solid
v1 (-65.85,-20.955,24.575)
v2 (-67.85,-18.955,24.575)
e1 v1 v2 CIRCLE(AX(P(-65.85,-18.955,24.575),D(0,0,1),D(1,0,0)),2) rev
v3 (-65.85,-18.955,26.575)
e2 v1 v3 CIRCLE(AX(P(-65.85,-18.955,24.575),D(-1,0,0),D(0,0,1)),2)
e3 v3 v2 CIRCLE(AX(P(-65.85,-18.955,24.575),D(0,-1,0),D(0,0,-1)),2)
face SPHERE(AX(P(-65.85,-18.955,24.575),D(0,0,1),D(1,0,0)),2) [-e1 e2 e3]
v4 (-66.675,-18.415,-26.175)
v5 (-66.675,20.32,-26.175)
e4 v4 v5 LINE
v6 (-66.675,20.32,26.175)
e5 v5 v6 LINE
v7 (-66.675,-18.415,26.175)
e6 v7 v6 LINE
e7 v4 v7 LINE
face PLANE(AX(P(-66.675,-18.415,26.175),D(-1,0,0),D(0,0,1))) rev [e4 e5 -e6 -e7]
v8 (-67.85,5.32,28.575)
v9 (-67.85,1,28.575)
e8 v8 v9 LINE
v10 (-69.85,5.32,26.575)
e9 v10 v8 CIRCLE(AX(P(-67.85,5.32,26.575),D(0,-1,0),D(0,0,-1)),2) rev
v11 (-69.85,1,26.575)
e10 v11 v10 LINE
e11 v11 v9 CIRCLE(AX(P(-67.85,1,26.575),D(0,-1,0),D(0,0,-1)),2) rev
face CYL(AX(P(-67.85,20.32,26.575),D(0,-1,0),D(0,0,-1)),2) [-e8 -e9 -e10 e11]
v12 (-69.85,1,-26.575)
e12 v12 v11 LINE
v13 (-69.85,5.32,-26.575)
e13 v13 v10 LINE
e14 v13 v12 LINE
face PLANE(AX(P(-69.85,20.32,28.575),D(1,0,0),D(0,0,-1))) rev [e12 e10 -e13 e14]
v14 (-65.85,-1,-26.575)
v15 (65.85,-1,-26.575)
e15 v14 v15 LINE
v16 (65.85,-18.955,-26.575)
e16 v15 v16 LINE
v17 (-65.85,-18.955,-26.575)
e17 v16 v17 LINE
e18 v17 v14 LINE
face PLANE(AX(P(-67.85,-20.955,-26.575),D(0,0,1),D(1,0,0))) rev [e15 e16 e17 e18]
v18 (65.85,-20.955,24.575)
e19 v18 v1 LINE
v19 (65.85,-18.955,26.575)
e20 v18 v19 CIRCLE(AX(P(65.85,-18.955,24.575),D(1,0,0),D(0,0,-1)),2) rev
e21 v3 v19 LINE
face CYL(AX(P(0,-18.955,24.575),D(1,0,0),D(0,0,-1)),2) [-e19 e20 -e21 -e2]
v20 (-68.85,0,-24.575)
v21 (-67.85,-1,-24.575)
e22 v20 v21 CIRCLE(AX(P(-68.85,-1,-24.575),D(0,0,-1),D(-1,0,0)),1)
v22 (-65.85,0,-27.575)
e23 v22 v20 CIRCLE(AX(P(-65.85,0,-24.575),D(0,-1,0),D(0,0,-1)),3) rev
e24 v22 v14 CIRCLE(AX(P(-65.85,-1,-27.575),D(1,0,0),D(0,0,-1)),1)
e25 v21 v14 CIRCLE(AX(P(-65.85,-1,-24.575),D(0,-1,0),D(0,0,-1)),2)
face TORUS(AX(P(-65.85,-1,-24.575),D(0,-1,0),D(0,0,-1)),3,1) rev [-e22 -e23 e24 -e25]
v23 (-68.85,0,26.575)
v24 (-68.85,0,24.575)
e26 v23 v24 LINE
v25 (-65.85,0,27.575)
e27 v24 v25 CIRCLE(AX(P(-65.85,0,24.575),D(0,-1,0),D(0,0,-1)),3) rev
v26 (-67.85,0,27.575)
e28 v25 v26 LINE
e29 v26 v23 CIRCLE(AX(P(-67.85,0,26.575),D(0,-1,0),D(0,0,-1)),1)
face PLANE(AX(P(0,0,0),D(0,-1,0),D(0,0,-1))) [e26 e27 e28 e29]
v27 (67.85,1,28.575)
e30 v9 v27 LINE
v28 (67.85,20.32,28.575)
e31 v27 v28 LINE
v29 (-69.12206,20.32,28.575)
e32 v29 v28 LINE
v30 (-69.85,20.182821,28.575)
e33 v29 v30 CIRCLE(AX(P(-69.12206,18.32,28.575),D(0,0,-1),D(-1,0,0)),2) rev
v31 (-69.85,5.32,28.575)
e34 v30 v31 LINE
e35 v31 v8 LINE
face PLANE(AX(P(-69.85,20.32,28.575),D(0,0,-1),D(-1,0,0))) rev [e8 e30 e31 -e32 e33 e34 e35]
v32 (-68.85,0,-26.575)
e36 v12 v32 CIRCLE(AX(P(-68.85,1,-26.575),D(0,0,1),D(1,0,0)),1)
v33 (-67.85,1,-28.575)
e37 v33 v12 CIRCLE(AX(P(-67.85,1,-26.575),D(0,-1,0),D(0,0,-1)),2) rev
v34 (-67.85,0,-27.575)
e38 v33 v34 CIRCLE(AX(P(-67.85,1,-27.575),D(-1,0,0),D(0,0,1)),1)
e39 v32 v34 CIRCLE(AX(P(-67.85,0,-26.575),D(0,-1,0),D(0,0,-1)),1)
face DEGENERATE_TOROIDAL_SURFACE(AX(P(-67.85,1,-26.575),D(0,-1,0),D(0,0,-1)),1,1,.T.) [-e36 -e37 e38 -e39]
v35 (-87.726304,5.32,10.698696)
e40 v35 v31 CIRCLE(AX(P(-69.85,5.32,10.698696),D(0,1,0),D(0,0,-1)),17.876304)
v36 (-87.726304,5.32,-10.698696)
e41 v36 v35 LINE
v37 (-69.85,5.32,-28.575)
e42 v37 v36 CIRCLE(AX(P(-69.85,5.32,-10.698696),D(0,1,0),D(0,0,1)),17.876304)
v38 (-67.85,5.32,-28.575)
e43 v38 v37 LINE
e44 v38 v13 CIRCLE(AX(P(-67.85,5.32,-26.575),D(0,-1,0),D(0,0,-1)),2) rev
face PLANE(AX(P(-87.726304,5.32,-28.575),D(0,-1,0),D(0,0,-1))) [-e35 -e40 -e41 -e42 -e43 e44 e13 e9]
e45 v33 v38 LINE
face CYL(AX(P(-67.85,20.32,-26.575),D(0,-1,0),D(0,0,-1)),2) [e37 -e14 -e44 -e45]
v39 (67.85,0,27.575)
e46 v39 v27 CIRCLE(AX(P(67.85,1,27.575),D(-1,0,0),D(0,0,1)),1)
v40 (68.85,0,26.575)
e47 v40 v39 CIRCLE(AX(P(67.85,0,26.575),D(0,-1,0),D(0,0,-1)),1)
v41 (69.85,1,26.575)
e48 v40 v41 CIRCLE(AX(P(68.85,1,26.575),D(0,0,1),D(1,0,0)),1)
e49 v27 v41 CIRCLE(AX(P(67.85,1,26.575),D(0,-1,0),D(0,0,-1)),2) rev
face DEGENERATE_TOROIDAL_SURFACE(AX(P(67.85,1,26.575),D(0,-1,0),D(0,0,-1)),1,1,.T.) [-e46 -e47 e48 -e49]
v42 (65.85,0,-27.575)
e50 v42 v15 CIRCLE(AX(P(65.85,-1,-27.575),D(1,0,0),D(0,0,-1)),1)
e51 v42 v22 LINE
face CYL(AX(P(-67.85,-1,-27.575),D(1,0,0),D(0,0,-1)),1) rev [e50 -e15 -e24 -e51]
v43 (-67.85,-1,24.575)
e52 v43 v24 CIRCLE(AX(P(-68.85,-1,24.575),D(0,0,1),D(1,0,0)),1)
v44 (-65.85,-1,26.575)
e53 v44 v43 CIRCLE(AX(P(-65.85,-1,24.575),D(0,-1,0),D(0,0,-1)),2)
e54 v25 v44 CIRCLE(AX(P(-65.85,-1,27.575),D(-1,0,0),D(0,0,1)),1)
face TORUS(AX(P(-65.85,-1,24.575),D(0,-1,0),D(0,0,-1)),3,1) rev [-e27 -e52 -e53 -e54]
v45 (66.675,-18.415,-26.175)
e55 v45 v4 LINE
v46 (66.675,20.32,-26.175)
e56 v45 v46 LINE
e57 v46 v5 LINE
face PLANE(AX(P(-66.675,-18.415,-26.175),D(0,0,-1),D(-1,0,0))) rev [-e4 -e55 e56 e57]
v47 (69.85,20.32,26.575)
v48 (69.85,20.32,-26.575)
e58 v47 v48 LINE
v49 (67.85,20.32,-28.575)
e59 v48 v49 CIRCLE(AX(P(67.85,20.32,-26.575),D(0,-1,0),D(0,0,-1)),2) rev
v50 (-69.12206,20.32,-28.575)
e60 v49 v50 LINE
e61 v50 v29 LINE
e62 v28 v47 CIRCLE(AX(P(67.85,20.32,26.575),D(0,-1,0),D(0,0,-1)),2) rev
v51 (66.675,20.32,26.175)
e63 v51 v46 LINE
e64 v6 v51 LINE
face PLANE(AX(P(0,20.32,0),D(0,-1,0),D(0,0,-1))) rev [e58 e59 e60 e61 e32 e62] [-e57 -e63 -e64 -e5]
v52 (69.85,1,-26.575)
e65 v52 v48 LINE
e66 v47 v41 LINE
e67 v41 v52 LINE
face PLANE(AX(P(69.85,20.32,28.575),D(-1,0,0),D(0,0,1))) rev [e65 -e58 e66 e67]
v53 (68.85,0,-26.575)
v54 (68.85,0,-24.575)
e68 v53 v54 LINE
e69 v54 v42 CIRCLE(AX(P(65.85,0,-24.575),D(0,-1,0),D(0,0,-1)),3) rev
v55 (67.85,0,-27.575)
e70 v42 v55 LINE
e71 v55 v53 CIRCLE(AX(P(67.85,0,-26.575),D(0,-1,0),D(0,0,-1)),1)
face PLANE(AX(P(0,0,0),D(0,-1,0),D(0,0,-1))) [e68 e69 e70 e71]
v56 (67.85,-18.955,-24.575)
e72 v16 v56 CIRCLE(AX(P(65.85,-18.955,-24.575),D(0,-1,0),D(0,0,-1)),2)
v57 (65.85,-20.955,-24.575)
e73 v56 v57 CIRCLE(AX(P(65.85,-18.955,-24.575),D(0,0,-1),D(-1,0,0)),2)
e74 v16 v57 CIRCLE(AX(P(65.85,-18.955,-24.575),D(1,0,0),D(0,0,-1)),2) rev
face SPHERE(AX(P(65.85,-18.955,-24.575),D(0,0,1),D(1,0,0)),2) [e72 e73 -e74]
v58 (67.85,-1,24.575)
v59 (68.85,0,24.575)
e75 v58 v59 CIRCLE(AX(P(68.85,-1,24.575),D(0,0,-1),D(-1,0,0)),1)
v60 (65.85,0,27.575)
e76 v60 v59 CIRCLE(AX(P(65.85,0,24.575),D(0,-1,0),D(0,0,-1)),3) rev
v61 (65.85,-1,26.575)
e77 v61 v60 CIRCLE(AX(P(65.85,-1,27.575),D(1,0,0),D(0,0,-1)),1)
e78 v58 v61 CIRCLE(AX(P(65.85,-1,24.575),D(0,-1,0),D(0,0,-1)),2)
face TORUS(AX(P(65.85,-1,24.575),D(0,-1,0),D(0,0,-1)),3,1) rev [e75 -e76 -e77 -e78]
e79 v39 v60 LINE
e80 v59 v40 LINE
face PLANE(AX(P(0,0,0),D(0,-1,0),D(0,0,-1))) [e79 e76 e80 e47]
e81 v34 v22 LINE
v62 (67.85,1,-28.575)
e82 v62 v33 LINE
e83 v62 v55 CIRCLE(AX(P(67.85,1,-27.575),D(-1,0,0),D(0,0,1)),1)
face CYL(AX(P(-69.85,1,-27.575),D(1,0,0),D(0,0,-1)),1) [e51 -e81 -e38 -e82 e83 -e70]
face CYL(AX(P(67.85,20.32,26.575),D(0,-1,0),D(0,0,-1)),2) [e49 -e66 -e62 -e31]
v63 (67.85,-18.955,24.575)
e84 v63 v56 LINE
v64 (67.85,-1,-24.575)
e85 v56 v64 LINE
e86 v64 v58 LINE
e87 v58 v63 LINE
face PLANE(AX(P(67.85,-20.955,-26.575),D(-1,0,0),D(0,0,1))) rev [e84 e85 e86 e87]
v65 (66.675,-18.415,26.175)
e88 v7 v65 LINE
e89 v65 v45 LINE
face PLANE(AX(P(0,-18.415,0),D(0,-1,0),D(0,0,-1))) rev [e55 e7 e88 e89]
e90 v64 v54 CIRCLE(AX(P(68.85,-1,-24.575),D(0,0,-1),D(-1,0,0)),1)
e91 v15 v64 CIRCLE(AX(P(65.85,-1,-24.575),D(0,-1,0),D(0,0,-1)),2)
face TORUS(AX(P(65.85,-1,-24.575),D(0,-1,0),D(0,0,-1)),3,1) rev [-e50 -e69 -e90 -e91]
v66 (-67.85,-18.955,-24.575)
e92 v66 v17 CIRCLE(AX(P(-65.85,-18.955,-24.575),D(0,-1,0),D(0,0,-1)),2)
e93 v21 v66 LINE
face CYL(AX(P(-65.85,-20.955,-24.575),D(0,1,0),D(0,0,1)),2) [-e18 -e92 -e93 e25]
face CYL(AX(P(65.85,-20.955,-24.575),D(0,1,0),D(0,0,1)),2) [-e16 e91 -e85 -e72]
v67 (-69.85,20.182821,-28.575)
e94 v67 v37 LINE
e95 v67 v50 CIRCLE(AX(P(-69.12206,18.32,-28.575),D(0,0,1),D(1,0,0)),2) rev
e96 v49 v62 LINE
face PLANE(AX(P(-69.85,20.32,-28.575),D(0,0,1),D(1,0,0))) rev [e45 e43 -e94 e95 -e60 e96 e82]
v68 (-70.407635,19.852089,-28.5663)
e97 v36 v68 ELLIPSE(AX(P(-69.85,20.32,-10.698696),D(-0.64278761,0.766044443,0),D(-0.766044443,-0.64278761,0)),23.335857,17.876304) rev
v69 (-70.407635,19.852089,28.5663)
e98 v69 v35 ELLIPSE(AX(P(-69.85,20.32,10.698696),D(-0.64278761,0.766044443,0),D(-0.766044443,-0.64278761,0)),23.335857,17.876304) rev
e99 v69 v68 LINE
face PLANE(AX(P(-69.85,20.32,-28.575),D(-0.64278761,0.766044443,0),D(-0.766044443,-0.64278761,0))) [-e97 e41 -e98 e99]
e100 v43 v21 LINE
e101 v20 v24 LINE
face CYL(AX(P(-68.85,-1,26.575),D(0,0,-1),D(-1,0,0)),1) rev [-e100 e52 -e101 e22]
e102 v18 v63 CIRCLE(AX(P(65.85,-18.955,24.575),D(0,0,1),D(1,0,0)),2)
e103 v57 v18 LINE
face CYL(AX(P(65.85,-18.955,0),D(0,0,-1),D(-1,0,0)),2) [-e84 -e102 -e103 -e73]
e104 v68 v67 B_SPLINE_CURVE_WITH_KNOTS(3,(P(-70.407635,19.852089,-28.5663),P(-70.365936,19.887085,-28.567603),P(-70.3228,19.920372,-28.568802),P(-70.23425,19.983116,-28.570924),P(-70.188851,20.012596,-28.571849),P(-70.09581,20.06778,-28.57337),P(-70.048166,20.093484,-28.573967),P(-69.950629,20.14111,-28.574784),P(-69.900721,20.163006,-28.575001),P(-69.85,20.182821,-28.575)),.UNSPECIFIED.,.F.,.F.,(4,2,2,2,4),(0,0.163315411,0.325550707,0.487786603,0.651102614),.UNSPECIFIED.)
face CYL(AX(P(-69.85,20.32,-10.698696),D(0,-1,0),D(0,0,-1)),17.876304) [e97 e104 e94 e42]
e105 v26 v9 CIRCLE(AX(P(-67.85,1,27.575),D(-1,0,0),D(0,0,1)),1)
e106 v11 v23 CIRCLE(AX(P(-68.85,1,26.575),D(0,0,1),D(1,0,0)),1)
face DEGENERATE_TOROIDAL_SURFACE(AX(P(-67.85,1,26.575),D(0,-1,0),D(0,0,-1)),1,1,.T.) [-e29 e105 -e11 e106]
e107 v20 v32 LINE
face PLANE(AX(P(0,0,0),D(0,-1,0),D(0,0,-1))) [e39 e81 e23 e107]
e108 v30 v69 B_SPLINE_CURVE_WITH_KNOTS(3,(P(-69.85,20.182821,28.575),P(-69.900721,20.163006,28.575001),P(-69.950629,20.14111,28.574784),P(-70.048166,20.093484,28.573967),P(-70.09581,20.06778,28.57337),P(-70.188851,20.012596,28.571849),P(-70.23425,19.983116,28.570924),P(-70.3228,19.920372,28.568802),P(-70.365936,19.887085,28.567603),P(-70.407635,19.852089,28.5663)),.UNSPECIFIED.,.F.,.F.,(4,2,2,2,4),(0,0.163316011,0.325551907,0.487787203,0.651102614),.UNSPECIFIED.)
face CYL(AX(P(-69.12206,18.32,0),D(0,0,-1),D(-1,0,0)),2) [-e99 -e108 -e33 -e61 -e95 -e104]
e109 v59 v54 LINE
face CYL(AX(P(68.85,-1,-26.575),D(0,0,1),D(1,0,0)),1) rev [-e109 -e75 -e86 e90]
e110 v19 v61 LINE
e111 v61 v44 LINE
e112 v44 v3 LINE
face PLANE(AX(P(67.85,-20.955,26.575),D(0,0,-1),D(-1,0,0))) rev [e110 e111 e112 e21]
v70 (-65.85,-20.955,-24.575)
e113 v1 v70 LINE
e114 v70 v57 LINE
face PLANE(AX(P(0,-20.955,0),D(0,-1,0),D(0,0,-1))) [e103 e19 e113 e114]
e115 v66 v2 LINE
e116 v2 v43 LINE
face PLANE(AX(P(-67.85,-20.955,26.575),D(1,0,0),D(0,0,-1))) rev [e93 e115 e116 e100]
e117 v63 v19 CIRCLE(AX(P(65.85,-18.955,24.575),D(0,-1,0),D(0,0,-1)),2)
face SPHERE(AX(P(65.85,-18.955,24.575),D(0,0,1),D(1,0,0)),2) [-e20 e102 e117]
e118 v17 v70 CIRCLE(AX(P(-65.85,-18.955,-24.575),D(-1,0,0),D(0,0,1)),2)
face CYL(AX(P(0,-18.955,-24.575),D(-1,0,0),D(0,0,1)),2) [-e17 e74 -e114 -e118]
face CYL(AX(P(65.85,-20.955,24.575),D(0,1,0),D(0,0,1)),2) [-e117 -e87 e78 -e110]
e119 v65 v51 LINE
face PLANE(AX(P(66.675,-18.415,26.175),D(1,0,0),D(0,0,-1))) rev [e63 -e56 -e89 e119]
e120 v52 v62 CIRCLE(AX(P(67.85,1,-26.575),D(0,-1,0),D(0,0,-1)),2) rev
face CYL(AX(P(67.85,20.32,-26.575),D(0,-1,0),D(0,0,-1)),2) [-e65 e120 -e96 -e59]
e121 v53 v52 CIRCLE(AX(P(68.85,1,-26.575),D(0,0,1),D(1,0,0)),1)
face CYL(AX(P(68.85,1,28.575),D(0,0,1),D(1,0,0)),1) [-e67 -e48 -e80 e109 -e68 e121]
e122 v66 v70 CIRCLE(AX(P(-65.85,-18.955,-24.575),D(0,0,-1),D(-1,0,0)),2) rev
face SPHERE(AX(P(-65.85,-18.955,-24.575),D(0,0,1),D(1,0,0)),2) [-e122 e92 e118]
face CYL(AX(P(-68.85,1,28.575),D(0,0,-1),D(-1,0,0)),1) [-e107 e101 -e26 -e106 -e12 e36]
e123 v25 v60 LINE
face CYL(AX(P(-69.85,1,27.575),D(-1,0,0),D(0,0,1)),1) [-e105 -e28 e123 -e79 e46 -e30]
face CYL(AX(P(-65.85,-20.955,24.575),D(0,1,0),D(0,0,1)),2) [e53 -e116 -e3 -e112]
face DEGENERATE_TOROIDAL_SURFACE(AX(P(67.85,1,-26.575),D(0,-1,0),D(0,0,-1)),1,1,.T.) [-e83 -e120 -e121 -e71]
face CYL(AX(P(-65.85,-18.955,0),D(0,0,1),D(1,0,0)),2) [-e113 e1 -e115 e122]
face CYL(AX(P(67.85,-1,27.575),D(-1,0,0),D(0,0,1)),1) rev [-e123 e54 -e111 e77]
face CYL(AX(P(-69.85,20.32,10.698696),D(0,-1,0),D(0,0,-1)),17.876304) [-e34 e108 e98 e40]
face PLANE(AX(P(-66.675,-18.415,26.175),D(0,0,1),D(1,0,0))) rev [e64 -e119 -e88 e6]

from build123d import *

# Parameters (mm, degrees)
SKETCH1_W           = 139.7
SKETCH1_H           = 57.15
BOSS_EXTRUDE1_DEPTH = 20.32
SKETCH2_W           = 135.7
SKETCH2_H           = 53.15
BOSS_EXTRUDE2_DEPTH = 20.955
BOSS_EXTRUDE3_DEPTH = 57.15
CUT_EXTRUDE1_DEPTH  = 96.931280842
FILLET1_R           = 2
FILLET2_R           = 1
SKETCH5_W           = 133.35
SKETCH5_H           = 52.35
CUT_EXTRUDE2_DEPTH  = 38.735


with BuildPart() as part:
    # Sketch1 → Boss-Extrude1 (new body)
    with BuildSketch(Plane(origin=(0, 0, 0), x_dir=(1, 0, 0), z_dir=(0, 1, 0))):
        Rectangle(SKETCH1_W, SKETCH1_H)
    extrude(amount=BOSS_EXTRUDE1_DEPTH)

    # Sketch2 → Boss-Extrude2 (add)
    with BuildSketch(Plane.XZ):
        Rectangle(SKETCH2_W, SKETCH2_H)
    extrude(amount=BOSS_EXTRUDE2_DEPTH)

    # Sketch3 → Boss-Extrude3 (add, through all)
    with BuildSketch(Plane.XY.offset(28.575)):
        Polygon((-69.85, 20.32), (-87.726303889, 5.32), (-69.85, 5.32), align=None)
    extrude(amount=-BOSS_EXTRUDE3_DEPTH)

    # Sketch4 → Cut-Extrude1 (cut, through all)
    with BuildSketch(Plane.XZ.offset(-5.32)):
        with BuildLine():
            Line((-69.85, -28.575), (-87.726303889, -28.575))
            Line((-87.726303889, -28.575), (-87.726303889, -10.698696111))
            ThreePointArc((-87.726303889, -10.698696111), (-82.490455702, -23.339151813), (-69.85, -28.575))
        make_face()
        with BuildLine():
            Line((-87.726303889, 10.698696111), (-87.726303889, 28.575))
            Line((-87.726303889, 28.575), (-69.85, 28.575))
            ThreePointArc((-69.85, 28.575), (-82.490455702, 23.339151813), (-87.726303889, 10.698696111))
        make_face()
    extrude(amount=-CUT_EXTRUDE1_DEPTH, mode=Mode.SUBTRACT)

    # Fillet1
    fillet1_edges = [part.edges().sort_by_distance(p)[0] for p in [
        (-69.85, 20.32, 0),
        (-69.85, 2.66, -28.575),
        (-67.85, -10.4775, -26.575),
        (69.85, 10.16, -28.575),
        (67.85, -10.4775, -26.575),
        (69.85, 10.16, 28.575),
        (67.85, -10.4775, 26.575),
        (-67.85, -10.4775, 26.575),
        (-69.85, 2.66, 28.575),
        (-67.85, -20.955, 0),
        (0, -20.955, 26.575),
        (67.85, -20.955, 0),
        (0, -20.955, -26.575),
    ]]
    fillet(fillet1_edges, radius=FILLET1_R)

    # Fillet2
    fillet2_edges = [part.edges().sort_by_distance(p)[0] for p in [
        (0, 0, 28.575),
        (0, 0, -28.575),
        (-67.85, 0, 0),
        (0, 0, 26.575),
        (67.85, 0, 0),
        (0, 0, -26.575),
        (-69.85, 0, 0),
        (69.85, 0, 0),
        (-69.264213562, 0, 27.989213562),
        (69.264213562, 0, 27.989213562),
        (69.264213562, 0, -27.989213562),
        (-69.264213562, 0, -27.989213562),
        (-67.264213562, 0, -25.989213562),
        (67.264213562, 0, -25.989213562),
        (67.264213562, 0, 25.989213562),
        (-67.264213562, 0, 25.989213562),
    ]]
    fillet(fillet2_edges, radius=FILLET2_R - 0.0001)  # a hair under: the kernel refuses the full size

    # Sketch5 → Cut-Extrude2 (cut)
    with BuildSketch(Plane(origin=(0, 20.32, 0), x_dir=(1, 0, 0), z_dir=(0, 1, 0))):
        Rectangle(SKETCH5_W, SKETCH5_H)
    extrude(amount=-CUT_EXTRUDE2_DEPTH, mode=Mode.SUBTRACT)


solid = part.part
